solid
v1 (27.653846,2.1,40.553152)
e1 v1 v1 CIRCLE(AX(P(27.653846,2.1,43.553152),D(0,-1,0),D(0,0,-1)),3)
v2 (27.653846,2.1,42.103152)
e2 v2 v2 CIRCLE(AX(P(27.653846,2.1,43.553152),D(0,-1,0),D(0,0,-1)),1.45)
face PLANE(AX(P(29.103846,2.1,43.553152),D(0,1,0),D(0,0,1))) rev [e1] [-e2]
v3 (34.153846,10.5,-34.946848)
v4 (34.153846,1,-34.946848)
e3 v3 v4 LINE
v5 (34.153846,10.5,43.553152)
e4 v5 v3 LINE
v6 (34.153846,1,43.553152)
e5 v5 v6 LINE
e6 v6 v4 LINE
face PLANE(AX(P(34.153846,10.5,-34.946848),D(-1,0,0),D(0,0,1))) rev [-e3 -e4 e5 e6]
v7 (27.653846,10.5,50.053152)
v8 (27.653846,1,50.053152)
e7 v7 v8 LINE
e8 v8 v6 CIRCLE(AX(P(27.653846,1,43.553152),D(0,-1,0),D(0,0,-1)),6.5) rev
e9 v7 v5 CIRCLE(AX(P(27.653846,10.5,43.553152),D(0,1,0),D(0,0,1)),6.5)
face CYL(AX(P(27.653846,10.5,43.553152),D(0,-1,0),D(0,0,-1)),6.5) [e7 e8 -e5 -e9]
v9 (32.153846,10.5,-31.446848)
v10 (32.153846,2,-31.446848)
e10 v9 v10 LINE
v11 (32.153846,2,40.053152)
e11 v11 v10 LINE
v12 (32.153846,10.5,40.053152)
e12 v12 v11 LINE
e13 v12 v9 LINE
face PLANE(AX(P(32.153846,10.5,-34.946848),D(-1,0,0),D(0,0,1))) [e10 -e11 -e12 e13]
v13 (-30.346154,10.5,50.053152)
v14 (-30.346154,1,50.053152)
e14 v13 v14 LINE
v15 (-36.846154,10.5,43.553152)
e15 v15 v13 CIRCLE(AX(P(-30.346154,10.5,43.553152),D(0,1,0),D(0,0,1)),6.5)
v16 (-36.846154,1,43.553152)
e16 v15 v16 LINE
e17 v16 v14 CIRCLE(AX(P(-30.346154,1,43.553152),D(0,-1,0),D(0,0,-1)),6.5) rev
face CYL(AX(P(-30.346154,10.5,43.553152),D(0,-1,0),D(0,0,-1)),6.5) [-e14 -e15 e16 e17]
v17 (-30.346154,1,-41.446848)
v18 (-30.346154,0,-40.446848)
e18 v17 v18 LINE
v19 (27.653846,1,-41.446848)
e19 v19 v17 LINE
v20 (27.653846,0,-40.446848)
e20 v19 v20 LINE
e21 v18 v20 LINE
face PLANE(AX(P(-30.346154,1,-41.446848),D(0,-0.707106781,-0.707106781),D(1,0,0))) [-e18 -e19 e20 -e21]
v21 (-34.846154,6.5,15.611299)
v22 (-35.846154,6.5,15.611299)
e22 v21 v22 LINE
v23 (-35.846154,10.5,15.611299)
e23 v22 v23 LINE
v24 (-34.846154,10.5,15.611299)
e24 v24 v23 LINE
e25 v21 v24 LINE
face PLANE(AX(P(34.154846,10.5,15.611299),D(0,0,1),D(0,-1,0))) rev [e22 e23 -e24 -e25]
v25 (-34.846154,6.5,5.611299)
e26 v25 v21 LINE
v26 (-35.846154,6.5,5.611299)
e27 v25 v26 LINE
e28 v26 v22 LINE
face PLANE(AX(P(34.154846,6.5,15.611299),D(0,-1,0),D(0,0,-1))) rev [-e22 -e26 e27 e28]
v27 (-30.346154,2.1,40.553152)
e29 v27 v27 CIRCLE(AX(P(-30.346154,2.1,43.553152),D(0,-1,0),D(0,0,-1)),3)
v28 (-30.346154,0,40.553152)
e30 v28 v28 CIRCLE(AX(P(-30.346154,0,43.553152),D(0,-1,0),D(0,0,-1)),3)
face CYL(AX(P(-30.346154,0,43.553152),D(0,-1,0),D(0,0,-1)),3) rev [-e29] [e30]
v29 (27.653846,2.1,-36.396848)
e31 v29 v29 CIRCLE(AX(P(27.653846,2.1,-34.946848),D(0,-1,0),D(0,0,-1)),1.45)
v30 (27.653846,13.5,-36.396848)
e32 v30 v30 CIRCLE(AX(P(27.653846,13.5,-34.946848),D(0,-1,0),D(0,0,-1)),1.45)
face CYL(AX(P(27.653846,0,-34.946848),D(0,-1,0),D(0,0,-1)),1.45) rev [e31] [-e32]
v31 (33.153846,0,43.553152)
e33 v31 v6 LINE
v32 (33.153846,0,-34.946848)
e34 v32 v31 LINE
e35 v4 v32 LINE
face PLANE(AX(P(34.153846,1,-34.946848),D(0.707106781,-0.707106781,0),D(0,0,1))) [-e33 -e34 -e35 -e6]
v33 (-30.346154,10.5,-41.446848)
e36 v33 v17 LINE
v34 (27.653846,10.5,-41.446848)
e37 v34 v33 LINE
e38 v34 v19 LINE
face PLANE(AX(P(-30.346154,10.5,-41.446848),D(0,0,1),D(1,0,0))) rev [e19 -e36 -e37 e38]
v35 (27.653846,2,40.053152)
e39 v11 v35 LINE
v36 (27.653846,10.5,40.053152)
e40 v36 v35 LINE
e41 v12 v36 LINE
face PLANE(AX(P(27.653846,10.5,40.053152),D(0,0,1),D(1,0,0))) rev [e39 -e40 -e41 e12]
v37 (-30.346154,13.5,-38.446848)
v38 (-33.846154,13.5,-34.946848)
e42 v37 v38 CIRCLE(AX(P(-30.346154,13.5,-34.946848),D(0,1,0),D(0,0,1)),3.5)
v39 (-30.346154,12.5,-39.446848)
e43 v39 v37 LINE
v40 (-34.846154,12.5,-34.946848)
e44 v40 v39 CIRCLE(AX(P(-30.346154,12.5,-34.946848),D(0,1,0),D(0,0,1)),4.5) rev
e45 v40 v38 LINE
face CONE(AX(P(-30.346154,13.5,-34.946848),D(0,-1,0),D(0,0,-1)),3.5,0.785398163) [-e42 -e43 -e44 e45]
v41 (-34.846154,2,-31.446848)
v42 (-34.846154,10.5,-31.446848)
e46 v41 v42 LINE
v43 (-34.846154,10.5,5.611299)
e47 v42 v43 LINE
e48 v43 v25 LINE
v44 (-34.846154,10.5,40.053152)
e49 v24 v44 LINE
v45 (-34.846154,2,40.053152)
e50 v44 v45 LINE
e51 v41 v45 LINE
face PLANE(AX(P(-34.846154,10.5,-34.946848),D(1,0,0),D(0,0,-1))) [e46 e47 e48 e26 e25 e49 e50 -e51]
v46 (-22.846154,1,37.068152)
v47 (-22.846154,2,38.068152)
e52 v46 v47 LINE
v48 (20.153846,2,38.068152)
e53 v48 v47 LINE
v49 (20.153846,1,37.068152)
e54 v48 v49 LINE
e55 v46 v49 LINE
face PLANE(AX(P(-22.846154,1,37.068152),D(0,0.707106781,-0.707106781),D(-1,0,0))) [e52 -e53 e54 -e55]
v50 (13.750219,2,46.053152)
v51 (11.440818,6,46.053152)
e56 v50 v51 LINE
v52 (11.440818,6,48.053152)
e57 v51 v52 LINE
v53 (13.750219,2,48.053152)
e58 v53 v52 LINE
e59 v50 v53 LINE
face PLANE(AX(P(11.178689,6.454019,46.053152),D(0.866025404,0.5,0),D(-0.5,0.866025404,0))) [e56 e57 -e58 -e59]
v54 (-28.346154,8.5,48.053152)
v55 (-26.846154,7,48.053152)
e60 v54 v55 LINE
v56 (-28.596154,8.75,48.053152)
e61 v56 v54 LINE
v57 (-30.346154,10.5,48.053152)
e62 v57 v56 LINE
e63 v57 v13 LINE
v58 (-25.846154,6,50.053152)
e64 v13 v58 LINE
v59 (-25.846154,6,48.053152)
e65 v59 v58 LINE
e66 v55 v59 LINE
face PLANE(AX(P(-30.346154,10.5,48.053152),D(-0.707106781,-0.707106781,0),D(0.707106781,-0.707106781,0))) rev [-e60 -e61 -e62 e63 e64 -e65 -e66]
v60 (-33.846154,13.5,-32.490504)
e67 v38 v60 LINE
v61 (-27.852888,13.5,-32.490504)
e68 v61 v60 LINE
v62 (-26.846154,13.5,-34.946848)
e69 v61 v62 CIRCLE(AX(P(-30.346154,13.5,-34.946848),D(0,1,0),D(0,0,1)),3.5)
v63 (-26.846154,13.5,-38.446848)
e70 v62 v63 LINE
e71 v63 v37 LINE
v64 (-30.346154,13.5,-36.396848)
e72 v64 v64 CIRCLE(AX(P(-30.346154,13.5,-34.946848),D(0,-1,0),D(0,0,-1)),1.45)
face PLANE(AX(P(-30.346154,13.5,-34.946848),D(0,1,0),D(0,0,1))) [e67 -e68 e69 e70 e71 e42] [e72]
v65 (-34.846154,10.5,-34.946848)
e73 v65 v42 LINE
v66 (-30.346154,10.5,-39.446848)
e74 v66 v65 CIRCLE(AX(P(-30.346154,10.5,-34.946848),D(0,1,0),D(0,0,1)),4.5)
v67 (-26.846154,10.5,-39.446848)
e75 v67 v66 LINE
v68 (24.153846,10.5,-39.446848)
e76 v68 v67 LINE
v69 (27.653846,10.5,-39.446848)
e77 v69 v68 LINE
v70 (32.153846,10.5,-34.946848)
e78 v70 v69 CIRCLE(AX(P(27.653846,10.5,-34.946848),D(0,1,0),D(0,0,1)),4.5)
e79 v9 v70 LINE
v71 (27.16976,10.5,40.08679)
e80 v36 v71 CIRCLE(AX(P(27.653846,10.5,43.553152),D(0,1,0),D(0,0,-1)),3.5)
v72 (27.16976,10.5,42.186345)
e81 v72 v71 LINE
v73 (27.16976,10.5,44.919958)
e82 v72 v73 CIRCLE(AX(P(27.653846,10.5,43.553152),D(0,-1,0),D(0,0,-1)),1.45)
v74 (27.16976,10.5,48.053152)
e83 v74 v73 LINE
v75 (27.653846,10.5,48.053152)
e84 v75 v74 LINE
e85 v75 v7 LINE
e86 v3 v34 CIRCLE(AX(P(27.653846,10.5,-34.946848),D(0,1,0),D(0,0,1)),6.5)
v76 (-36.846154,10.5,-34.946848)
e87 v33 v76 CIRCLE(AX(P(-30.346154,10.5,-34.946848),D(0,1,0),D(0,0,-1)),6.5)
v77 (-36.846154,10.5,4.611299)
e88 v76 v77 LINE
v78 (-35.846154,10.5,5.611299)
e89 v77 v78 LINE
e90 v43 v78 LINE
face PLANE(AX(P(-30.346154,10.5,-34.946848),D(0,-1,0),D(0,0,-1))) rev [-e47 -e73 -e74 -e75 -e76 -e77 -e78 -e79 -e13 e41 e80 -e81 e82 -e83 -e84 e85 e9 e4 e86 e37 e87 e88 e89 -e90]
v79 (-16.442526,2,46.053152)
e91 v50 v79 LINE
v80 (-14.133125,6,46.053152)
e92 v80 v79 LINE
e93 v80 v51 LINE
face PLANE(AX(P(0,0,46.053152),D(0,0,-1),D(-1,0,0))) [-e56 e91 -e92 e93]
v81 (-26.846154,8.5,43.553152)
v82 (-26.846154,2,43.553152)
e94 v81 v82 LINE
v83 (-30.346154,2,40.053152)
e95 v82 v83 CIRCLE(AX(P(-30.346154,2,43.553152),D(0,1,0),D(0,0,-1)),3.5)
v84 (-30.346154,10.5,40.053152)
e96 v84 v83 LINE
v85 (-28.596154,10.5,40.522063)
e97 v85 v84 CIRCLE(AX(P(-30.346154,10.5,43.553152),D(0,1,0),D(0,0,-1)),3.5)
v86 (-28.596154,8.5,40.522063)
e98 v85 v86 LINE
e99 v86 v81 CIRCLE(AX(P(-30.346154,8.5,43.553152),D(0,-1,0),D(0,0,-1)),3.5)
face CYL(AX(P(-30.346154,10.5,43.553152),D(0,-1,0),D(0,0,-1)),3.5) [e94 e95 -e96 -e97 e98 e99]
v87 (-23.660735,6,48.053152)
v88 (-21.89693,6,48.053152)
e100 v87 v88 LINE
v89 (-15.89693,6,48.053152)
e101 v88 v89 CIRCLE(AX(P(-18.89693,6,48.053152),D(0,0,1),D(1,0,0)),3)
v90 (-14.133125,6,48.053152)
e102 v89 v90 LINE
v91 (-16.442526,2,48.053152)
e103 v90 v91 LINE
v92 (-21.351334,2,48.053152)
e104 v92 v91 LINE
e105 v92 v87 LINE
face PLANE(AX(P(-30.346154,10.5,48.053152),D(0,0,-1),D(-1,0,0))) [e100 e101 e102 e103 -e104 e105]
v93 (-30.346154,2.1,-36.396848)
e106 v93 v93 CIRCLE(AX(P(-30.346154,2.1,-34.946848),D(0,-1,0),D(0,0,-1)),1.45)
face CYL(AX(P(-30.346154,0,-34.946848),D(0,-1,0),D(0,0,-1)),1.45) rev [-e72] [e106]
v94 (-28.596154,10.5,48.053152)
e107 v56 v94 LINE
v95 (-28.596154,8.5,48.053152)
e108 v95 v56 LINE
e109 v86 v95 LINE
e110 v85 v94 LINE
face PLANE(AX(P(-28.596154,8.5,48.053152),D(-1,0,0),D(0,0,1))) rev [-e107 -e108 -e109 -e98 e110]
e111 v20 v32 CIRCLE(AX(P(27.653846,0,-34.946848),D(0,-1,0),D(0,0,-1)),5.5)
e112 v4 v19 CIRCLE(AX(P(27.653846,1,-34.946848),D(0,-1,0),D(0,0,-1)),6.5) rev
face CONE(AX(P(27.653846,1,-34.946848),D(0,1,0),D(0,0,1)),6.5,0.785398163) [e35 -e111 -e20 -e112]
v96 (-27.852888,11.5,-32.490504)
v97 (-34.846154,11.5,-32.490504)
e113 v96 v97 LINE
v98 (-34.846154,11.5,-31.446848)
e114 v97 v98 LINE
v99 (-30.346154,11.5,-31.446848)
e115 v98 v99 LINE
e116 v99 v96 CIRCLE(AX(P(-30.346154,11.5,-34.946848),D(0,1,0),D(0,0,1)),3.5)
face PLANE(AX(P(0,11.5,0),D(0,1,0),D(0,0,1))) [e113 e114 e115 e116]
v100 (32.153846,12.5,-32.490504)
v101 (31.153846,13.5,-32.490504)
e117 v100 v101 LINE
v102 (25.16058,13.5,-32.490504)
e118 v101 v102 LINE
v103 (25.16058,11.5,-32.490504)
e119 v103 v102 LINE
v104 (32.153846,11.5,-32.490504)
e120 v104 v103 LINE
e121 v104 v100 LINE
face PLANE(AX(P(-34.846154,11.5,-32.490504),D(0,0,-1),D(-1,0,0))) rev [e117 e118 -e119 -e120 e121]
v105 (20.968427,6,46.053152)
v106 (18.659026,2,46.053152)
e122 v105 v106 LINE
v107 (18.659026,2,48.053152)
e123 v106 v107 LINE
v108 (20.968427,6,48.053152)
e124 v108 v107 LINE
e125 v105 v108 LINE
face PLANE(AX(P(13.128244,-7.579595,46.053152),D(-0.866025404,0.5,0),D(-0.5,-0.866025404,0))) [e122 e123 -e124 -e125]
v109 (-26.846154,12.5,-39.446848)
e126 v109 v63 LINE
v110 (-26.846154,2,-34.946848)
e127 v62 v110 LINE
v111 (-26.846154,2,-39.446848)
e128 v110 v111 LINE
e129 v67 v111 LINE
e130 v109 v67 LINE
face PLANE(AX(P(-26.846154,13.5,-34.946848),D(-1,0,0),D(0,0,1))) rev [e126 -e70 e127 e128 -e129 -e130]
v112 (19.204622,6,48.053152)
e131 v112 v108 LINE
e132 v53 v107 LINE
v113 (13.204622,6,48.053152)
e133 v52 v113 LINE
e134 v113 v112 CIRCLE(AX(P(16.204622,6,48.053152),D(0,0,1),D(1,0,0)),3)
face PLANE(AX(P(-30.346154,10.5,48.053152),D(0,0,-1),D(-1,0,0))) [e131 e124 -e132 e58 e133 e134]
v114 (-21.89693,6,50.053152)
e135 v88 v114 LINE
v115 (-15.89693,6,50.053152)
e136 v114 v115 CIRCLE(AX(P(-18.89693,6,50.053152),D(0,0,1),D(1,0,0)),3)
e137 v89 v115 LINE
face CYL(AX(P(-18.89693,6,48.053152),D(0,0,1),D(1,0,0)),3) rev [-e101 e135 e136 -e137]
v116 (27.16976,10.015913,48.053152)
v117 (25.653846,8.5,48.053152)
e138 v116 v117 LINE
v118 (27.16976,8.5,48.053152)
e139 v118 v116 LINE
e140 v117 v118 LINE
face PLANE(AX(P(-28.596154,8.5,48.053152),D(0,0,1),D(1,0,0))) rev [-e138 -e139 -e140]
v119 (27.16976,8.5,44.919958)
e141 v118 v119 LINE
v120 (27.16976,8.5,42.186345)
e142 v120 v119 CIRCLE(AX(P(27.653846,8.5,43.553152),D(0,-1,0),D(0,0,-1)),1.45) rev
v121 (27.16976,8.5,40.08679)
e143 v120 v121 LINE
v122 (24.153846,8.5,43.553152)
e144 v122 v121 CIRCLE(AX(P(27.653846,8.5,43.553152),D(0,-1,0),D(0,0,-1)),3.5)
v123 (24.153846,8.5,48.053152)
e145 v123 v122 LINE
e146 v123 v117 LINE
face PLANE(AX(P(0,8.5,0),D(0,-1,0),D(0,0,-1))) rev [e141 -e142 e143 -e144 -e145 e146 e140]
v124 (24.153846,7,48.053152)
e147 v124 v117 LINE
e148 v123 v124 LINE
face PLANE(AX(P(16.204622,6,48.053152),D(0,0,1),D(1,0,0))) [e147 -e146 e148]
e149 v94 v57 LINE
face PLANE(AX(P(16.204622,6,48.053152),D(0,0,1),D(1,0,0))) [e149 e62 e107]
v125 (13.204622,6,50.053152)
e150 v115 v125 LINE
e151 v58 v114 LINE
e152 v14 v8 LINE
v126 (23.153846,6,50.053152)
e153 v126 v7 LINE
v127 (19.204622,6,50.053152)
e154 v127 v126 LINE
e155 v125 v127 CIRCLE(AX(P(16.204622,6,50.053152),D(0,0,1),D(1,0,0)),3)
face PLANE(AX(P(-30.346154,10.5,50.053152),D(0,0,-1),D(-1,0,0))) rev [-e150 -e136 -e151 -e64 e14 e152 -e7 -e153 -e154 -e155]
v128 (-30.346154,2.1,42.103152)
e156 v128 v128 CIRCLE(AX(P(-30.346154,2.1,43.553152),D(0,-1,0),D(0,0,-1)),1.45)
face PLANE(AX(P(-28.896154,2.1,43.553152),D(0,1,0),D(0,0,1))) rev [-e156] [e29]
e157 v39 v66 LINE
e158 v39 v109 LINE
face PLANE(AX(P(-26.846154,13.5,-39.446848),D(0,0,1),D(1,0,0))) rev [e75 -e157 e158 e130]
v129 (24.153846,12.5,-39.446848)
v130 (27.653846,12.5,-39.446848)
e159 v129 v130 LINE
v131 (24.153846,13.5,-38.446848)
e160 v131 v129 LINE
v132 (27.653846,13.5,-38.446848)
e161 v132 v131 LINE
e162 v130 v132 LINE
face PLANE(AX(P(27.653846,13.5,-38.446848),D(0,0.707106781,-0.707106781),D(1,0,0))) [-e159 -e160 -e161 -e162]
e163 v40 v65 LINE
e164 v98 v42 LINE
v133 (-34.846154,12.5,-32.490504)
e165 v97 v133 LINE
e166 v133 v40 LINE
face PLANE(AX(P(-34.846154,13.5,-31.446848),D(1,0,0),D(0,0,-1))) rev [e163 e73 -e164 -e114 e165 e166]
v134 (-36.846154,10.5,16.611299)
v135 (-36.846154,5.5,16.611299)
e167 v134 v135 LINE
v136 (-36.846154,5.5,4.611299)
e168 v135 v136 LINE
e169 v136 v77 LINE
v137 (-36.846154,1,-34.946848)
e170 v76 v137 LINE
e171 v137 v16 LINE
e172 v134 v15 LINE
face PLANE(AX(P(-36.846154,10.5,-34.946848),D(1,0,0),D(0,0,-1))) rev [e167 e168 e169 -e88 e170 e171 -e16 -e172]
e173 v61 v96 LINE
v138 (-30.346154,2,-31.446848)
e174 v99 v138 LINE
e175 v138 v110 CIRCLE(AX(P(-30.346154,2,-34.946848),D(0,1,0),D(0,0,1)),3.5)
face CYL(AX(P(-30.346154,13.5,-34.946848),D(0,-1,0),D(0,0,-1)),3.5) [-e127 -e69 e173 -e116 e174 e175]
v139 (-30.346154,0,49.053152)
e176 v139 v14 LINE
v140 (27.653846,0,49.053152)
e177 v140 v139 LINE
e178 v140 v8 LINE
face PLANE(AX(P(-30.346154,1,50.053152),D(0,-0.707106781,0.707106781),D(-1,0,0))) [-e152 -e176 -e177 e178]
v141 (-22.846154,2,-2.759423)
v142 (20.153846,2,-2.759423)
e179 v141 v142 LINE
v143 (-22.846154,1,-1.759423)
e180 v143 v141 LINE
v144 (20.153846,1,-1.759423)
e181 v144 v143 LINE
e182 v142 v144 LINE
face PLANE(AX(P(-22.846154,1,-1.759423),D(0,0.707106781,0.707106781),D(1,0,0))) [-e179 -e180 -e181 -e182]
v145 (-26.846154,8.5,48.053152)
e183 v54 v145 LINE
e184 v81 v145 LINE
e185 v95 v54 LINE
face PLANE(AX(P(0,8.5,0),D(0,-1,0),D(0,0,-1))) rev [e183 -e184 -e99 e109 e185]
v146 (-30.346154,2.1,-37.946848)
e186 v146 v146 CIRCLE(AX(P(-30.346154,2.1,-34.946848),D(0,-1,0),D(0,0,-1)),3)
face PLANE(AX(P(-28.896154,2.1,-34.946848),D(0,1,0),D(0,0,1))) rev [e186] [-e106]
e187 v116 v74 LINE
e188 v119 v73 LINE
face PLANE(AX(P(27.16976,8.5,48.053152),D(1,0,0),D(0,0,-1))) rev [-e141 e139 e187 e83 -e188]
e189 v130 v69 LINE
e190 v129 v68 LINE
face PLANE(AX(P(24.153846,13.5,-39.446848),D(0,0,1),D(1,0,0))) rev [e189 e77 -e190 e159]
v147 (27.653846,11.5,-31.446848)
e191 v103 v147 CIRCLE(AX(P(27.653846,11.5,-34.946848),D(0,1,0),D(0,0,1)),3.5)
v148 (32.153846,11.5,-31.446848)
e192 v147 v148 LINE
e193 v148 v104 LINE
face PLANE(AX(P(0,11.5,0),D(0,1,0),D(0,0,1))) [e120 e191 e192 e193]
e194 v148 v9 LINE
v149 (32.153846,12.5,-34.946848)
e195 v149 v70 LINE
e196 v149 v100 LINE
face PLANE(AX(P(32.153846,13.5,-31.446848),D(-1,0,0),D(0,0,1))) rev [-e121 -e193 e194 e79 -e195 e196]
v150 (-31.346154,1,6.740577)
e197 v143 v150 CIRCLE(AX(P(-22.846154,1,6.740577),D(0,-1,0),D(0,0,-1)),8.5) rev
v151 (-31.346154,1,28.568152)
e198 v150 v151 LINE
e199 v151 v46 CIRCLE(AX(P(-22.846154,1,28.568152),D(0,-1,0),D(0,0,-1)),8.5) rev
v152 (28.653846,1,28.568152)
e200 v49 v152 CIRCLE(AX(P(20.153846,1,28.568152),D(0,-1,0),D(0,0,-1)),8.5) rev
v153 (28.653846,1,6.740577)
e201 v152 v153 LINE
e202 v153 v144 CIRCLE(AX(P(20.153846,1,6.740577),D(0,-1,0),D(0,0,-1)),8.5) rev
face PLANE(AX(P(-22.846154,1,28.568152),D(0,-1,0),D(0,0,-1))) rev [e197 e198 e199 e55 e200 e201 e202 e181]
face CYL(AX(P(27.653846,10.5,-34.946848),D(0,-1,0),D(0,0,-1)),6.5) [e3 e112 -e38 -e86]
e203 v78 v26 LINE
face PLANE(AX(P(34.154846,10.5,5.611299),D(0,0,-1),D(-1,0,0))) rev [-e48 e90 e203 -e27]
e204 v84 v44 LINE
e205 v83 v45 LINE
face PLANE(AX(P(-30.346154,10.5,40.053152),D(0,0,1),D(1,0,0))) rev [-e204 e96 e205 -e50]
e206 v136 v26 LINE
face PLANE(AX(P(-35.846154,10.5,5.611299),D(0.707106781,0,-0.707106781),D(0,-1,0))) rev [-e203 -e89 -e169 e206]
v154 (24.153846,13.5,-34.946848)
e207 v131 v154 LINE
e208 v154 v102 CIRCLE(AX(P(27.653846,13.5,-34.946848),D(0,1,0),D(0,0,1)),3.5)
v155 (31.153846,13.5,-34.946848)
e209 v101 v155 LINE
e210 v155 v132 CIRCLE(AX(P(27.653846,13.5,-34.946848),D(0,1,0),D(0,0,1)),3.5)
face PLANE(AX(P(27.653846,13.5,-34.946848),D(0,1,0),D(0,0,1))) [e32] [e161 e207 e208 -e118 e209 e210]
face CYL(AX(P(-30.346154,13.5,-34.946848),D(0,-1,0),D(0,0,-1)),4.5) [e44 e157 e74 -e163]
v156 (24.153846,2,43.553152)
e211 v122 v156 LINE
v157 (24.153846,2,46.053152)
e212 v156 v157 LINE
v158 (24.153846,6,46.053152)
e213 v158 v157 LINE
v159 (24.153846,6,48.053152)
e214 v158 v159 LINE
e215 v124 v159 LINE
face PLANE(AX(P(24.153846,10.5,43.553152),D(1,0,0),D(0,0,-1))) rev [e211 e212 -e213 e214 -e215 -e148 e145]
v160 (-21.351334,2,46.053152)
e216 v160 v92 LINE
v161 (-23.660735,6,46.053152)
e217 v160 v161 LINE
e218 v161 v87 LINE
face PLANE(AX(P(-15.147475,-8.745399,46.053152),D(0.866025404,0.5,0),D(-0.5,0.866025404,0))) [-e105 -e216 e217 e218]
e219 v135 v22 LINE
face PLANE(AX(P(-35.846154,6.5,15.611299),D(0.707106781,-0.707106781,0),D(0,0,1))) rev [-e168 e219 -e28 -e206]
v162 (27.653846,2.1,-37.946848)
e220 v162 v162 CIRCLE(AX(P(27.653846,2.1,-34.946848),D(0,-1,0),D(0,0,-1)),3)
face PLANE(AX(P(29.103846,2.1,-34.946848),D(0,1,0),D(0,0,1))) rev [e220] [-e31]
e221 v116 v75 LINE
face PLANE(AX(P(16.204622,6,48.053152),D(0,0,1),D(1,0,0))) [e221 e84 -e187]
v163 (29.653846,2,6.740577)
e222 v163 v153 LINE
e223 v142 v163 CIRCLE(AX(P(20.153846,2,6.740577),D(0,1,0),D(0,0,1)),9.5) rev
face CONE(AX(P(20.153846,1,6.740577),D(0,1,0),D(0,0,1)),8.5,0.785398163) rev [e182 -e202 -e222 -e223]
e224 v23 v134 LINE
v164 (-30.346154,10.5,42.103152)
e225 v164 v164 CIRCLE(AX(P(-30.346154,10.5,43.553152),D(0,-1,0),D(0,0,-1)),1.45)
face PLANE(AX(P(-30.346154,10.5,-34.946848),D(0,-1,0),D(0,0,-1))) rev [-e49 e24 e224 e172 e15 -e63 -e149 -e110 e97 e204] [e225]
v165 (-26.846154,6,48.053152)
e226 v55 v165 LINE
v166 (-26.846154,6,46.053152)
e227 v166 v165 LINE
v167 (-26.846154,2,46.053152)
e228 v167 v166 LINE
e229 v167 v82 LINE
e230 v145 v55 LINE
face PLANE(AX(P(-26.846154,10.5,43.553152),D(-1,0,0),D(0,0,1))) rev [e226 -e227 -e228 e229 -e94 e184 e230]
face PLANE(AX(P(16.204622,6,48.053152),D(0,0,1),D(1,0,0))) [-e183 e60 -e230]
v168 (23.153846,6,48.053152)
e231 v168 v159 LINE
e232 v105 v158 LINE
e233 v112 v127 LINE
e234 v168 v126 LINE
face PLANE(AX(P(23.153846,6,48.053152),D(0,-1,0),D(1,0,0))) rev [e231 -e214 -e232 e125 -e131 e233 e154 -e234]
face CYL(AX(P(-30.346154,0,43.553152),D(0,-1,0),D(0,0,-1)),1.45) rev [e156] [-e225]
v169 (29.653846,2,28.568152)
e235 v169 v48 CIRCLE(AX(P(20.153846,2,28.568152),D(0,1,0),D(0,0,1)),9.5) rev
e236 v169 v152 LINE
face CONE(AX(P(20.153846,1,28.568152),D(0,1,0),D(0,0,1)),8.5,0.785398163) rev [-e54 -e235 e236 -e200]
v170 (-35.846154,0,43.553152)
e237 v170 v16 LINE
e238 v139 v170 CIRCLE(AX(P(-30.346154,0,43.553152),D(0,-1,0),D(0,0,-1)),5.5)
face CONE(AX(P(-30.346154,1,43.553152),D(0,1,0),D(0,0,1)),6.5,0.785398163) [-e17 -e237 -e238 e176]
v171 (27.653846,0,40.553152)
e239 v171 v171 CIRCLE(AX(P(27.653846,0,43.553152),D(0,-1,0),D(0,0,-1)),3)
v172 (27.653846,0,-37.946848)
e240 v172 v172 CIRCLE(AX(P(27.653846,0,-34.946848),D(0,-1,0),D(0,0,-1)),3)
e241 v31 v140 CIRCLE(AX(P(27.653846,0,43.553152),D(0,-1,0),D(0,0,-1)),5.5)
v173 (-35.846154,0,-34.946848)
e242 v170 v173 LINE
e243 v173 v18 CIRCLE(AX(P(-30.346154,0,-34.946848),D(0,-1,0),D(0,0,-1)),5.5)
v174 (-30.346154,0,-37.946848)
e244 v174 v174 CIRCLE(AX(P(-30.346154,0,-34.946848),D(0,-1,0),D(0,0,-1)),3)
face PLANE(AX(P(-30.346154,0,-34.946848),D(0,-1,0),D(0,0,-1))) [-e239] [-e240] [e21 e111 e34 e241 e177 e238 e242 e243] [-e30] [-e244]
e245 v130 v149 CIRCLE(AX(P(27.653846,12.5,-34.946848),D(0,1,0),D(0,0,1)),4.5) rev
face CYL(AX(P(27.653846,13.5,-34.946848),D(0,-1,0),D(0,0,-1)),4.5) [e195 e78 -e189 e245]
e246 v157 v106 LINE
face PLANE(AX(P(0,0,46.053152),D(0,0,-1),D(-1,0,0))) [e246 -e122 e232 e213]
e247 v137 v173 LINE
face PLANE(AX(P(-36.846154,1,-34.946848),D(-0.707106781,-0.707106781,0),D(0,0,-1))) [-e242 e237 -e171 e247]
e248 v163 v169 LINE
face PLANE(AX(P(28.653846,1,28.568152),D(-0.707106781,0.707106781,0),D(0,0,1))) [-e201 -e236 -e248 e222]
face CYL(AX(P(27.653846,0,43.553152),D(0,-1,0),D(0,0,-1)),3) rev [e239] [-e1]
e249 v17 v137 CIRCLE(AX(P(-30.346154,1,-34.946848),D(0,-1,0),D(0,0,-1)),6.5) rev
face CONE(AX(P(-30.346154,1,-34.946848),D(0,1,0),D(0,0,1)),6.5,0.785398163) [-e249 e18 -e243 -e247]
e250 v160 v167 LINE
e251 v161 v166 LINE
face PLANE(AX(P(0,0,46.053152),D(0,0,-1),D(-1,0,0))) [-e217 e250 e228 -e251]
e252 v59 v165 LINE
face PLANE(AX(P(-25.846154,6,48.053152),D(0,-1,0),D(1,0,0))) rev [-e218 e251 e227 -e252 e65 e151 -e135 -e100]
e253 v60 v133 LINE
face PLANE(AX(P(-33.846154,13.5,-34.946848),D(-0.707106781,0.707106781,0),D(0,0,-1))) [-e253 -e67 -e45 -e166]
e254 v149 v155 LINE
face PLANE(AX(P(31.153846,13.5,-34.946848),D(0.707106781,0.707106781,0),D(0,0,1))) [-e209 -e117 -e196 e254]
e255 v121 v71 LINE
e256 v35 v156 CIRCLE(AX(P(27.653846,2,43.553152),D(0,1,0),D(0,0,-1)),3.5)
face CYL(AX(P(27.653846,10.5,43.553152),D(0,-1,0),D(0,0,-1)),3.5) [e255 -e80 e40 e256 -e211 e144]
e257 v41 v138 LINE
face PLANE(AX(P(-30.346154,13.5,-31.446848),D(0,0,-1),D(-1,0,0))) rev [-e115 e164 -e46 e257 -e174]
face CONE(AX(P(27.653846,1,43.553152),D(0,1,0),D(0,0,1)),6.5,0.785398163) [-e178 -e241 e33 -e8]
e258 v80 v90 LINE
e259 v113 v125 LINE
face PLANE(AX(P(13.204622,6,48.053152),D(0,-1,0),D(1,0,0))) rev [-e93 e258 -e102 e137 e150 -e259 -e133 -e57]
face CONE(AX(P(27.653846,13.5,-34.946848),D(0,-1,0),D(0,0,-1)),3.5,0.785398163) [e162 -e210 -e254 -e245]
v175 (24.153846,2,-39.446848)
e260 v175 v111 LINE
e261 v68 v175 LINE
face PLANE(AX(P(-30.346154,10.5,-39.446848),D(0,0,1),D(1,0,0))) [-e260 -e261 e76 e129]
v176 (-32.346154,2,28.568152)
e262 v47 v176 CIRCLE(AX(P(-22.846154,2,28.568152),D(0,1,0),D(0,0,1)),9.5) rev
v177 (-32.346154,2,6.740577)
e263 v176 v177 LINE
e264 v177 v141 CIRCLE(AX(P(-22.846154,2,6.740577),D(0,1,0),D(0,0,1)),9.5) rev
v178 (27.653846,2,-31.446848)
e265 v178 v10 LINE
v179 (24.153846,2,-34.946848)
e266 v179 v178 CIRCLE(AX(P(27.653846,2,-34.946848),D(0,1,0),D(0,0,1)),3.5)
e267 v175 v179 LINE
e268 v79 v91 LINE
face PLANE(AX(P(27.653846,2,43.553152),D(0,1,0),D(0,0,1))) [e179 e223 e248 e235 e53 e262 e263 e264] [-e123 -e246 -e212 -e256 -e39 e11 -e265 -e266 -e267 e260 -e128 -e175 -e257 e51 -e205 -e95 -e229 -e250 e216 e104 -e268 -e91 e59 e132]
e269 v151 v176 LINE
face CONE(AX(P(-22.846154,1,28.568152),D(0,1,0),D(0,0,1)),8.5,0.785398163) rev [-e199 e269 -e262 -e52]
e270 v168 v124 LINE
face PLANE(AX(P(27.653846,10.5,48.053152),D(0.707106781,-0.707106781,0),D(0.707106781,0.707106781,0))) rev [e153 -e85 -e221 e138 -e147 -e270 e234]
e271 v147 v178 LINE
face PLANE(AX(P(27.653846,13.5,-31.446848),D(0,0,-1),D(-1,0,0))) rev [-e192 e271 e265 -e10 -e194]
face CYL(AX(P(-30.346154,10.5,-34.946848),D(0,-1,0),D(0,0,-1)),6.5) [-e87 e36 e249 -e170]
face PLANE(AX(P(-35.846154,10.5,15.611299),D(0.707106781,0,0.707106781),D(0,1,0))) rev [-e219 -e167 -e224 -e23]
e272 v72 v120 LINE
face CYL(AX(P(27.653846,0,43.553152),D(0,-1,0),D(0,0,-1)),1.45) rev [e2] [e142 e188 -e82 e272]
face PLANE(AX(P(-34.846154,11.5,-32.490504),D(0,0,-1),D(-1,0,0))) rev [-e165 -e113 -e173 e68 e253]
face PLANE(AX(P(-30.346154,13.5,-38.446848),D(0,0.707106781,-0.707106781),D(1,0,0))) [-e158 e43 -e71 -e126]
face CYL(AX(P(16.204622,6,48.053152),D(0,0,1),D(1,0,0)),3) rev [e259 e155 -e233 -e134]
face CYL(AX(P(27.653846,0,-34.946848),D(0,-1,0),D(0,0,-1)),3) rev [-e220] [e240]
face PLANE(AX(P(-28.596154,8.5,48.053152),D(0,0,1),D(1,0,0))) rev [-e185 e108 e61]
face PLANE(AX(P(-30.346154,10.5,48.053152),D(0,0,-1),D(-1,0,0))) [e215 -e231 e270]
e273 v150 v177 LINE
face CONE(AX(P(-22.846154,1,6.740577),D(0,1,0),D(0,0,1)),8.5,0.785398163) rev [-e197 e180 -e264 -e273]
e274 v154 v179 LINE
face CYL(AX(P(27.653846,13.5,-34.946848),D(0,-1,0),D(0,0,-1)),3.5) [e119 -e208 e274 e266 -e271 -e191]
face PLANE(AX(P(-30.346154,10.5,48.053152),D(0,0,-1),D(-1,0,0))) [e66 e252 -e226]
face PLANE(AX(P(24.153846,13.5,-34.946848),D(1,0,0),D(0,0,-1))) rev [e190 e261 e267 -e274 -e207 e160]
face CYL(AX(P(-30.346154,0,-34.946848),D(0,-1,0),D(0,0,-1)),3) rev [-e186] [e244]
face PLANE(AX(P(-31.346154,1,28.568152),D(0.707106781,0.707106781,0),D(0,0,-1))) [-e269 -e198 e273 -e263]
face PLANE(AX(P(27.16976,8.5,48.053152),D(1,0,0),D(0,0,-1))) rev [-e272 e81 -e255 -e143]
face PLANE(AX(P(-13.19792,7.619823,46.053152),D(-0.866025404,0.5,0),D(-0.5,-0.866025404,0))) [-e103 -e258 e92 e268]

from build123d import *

# Parameters (mm, degrees)
BOSS_EXTRUDE1_DEPTH                                = 10.5
BOSS_EXTRUDE2_DEPTH                                = 2
BOSS_EXTRUDE4_DEPTH                                = 11.5
BOSS_EXTRUDE6_DEPTH                                = 8.5
CUT_EXTRUDE1_DEPTH                                 = 2
CUT_EXTRUDE2_REACH                                 = 89.912
SKETCH9_W                                          = 10
SKETCH9_H                                          = 4
CHAMFER1_SIZE                                      = 1
CHAMFER2_SIZE                                      = 1
CBORE_FOR_M2_5_PAN_HEAD_MACHINE_SCREW1_D           = 2.9
CBORE_FOR_M2_5_PAN_HEAD_MACHINE_SCREW1_CBORE_D     = 6
CBORE_FOR_M2_5_PAN_HEAD_MACHINE_SCREW1_CBORE_DEPTH = 2.1
CBORE_FOR_M2_5_PAN_HEAD_MACHINE_SCREW2_D           = 2.9
CBORE_FOR_M2_5_PAN_HEAD_MACHINE_SCREW2_CBORE_D     = 6
CBORE_FOR_M2_5_PAN_HEAD_MACHINE_SCREW2_CBORE_DEPTH = 2.1
CBORE_FOR_M2_5_PAN_HEAD_MACHINE_SCREW3_D           = 2.9
CBORE_FOR_M2_5_PAN_HEAD_MACHINE_SCREW3_CBORE_D     = 6
CBORE_FOR_M2_5_PAN_HEAD_MACHINE_SCREW3_CBORE_DEPTH = 2.1
CBORE_FOR_M2_5_PAN_HEAD_MACHINE_SCREW4_D           = 2.9
CBORE_FOR_M2_5_PAN_HEAD_MACHINE_SCREW4_CBORE_D     = 6
CBORE_FOR_M2_5_PAN_HEAD_MACHINE_SCREW4_CBORE_DEPTH = 2.1
SKETCH18_W                                         = 55.765913406
SKETCH18_H                                         = 7.966361229
CUT_EXTRUDE3_DEPTH                                 = 2
BOSS_EXTRUDE7_DEPTH                                = 2
SKETCH21_W                                         = 67
SKETCH21_H                                         = 1.043656047
CUT_EXTRUDE4_DEPTH                                 = 2
CUT_EXTRUDE5_DEPTH                                 = 1
CHAMFER4_SIZE                                      = 1.5
CHAMFER5_SIZE                                      = 1
CHAMFER6_SIZE                                      = 1


with BuildPart() as part:
    # Sketch2 → Boss-Extrude1 (new body)
    with BuildSketch(Plane(origin=(0, 0, 0), x_dir=(1, 0, 0), z_dir=(0, 1, 0))):
        with BuildLine():
            Line((-30.346153846, 41.446848386), (27.653846154, 41.446848386))
            ThreePointArc((27.653846154, 41.446848386), (32.250040232, 39.543042463), (34.153846154, 34.946848386))
            Line((34.153846154, 34.946848386), (34.153846154, -43.553151614))
            ThreePointArc((34.153846154, -43.553151614), (32.250040232, -48.149345692), (27.653846154, -50.053151614))
            Line((27.653846154, -50.053151614), (-30.346153846, -50.053151614))
            ThreePointArc((-30.346153846, -50.053151614), (-34.942347924, -48.149345692), (-36.846153846, -43.553151614))
            Line((-36.846153846, -43.553151614), (-36.846153846, 34.946848386))
            ThreePointArc((-36.846153846, 34.946848386), (-34.942347924, 39.543042463), (-30.346153846, 41.446848386))
        make_face()
        with BuildLine():
            Line((-30.346153846, 39.446848386), (27.653846154, 39.446848386))
            ThreePointArc((27.653846154, 39.446848386), (30.835826669, 38.128828901), (32.153846154, 34.946848386))
            Line((32.153846154, 34.946848386), (32.153846154, -43.553151614))
            ThreePointArc((32.153846154, -43.553151614), (30.835826669, -46.73513213), (27.653846154, -48.053151614))
            Line((27.653846154, -48.053151614), (-30.346153846, -48.053151614))
            ThreePointArc((-30.346153846, -48.053151614), (-33.528134361, -46.73513213), (-34.846153846, -43.553151614))
            Line((-34.846153846, -43.553151614), (-34.846153846, 34.946848386))
            ThreePointArc((-34.846153846, 34.946848386), (-33.528134361, 38.128828901), (-30.346153846, 39.446848386))
        make_face(mode=Mode.SUBTRACT)
    extrude(amount=BOSS_EXTRUDE1_DEPTH)

    # Sketch3 → Boss-Extrude2 (add)
    with BuildSketch(Plane(origin=(0, 0, 0), x_dir=(1, 0, 0), z_dir=(0, 1, 0))):
        with BuildLine():
            Line((-30.346153846, -48.053151614), (27.653846154, -48.053151614))
            ThreePointArc((27.653846154, -48.053151614), (30.835826669, -46.73513213), (32.153846154, -43.553151614))
            Line((32.153846154, -43.553151614), (32.153846154, 34.946848386))
            ThreePointArc((32.153846154, 34.946848386), (30.835826669, 38.128828901), (27.653846154, 39.446848386))
            Line((27.653846154, 39.446848386), (-30.346153846, 39.446848386))
            ThreePointArc((-30.346153846, 39.446848386), (-33.528134361, 38.128828901), (-34.846153846, 34.946848386))
            Line((-34.846153846, 34.946848386), (-34.846153846, -43.553151614))
            ThreePointArc((-34.846153846, -43.553151614), (-33.528134361, -46.73513213), (-30.346153846, -48.053151614))
        make_face()
    extrude(amount=BOSS_EXTRUDE2_DEPTH)

    # Sketch6 → Boss-Extrude4 (add)
    with BuildSketch(Plane(origin=(0, 2, 0), x_dir=(1, 0, 0), z_dir=(0, 1, 0))):
        with BuildLine():
            Line((-26.846153846, 34.946848386), (-26.846153846, 39.446848386))
            Line((-26.846153846, 39.446848386), (-30.346153846, 39.446848386))
            ThreePointArc((-30.346153846, 39.446848386), (-33.528134361, 38.128828901), (-34.846153846, 34.946848386))
            Line((-34.846153846, 34.946848386), (-34.846153846, 31.446848386))
            Line((-34.846153846, 31.446848386), (-30.346153846, 31.446848386))
            ThreePointArc((-30.346153846, 31.446848386), (-27.871280112, 32.471974652), (-26.846153846, 34.946848386))
        make_face()
        with BuildLine():
            Line((24.153846154, 34.946848386), (24.153846154, 39.446848386))
            Line((24.153846154, 39.446848386), (27.653846154, 39.446848386))
            ThreePointArc((27.653846154, 39.446848386), (30.835826669, 38.128828901), (32.153846154, 34.946848386))
            Line((32.153846154, 34.946848386), (32.153846154, 31.446848386))
            Line((32.153846154, 31.446848386), (27.653846154, 31.446848386))
            ThreePointArc((27.653846154, 31.446848386), (25.17897242, 32.471974652), (24.153846154, 34.946848386))
        make_face()
    extrude(amount=BOSS_EXTRUDE4_DEPTH)

    # Sketch8 → Boss-Extrude6 (add)
    with BuildSketch(Plane(origin=(0, 2, 0), x_dir=(1, 0, 0), z_dir=(0, 1, 0))):
        with BuildLine():
            Line((32.153846154, -40.053151614), (32.153846154, -43.553151614))
            ThreePointArc((32.153846154, -43.553151614), (30.835826669, -46.73513213), (27.653846154, -48.053151614))
            Line((27.653846154, -48.053151614), (24.153846154, -48.053151614))
            Line((24.153846154, -48.053151614), (24.153846154, -43.553151614))
            ThreePointArc((24.153846154, -43.553151614), (25.17897242, -41.07827788), (27.653846154, -40.053151614))
            Line((27.653846154, -40.053151614), (32.153846154, -40.053151614))
        make_face()
        with BuildLine():
            Line((-34.846153846, -40.053151614), (-34.846153846, -43.553151614))
            ThreePointArc((-34.846153846, -43.553151614), (-33.528134361, -46.73513213), (-30.346153846, -48.053151614))
            Line((-30.346153846, -48.053151614), (-26.846153846, -48.053151614))
            Line((-26.846153846, -48.053151614), (-26.846153846, -43.553151614))
            ThreePointArc((-26.846153846, -43.553151614), (-27.871280112, -41.07827788), (-30.346153846, -40.053151614))
            Line((-30.346153846, -40.053151614), (-34.846153846, -40.053151614))
        make_face()
    extrude(amount=BOSS_EXTRUDE6_DEPTH)

    # Sketch7 → Cut-Extrude1 (cut)
    with BuildSketch(Plane.XY.offset(50.053151614)):
        with BuildLine():
            Line((27.653846154, 10.5), (-30.346153846, 10.5))
            Line((-30.346153846, 10.5), (-25.846153846, 6))
            Line((-25.846153846, 6), (-21.89693017, 6))
            ThreePointArc((-21.89693017, 6), (-18.89693017, 3), (-15.89693017, 6))
            Line((-15.89693017, 6), (13.204622477, 6))
            ThreePointArc((13.204622477, 6), (16.204622477, 3), (19.204622477, 6))
            Line((19.204622477, 6), (23.153846154, 6))
            Line((23.153846154, 6), (27.653846154, 10.5))
        make_face()
    extrude(amount=-CUT_EXTRUDE1_DEPTH, mode=Mode.SUBTRACT)

    # Sketch9 → Cut-Extrude2 (cut, up to next)
    with BuildSketch(Plane.ZY.offset(36.846153846), mode=Mode.PRIVATE) as cut_extrude2_sk1:
        with Locations((10.611298715, 8.5)):
            Rectangle(SKETCH9_W, SKETCH9_H)
    cut_extrude2_tool1 = extrude(cut_extrude2_sk1.sketch, amount=-CUT_EXTRUDE2_REACH, mode=Mode.PRIVATE) & part.part
    add(cut_extrude2_tool1.solids().sort_by_distance((-36.846154, 8.5, 10.611299))[0], mode=Mode.SUBTRACT)

    # Chamfer1
    chamfer1_edges = [part.edges().sort_by_distance(p)[0] for p in [
        (-36.846153846, 8.5, 5.611298715),
        (-36.846153846, 6.5, 10.611298715),
        (-36.846153846, 8.5, 15.611298715),
    ]]
    chamfer(chamfer1_edges, length=CHAMFER1_SIZE)

    # Chamfer2
    chamfer2_edges = [part.edges().sort_by_distance(p)[0] for p in [
        (-36.846153846, 0, 4.303151614),
        (-34.942347924, 0, -39.543042463),
        (-1.346153846, 0, -41.446848386),
        (32.250040232, 0, -39.543042463),
        (34.153846154, 0, 4.303151614),
        (32.250040232, 0, 48.149345692),
        (-1.346153846, 0, 50.053151614),
        (-34.942347924, 0, 48.149345692),
    ]]
    chamfer(chamfer2_edges, length=CHAMFER2_SIZE)

    # CBORE for M2.5 Pan Head Machine Screw1 (through all)
    with Locations(Plane(origin=(0, 0, 0), x_dir=(-1, 0, 0), z_dir=(0, -1, 0))):
        with Locations((-27.653846154, 34.946848386)):
            CounterBoreHole(CBORE_FOR_M2_5_PAN_HEAD_MACHINE_SCREW1_D / 2, CBORE_FOR_M2_5_PAN_HEAD_MACHINE_SCREW1_CBORE_D / 2, CBORE_FOR_M2_5_PAN_HEAD_MACHINE_SCREW1_CBORE_DEPTH)

    # CBORE for M2.5 Pan Head Machine Screw2 (through all)
    with Locations(Plane(origin=(0, 0, 0), x_dir=(-1, 0, 0), z_dir=(0, -1, 0))):
        with Locations((30.346153846, 34.946848386)):
            CounterBoreHole(CBORE_FOR_M2_5_PAN_HEAD_MACHINE_SCREW2_D / 2, CBORE_FOR_M2_5_PAN_HEAD_MACHINE_SCREW2_CBORE_D / 2, CBORE_FOR_M2_5_PAN_HEAD_MACHINE_SCREW2_CBORE_DEPTH)

    # CBORE for M2.5 Pan Head Machine Screw3 (through all)
    with Locations(Plane(origin=(0, 0, 0), x_dir=(-1, 0, 0), z_dir=(0, -1, 0))):
        with Locations((-27.653846154, -43.553151614)):
            CounterBoreHole(CBORE_FOR_M2_5_PAN_HEAD_MACHINE_SCREW3_D / 2, CBORE_FOR_M2_5_PAN_HEAD_MACHINE_SCREW3_CBORE_D / 2, CBORE_FOR_M2_5_PAN_HEAD_MACHINE_SCREW3_CBORE_DEPTH)

    # CBORE for M2.5 Pan Head Machine Screw4 (through all)
    with Locations(Plane(origin=(0, 0, 0), x_dir=(-1, 0, 0), z_dir=(0, -1, 0))):
        with Locations((30.346153846, -43.553151614)):
            CounterBoreHole(CBORE_FOR_M2_5_PAN_HEAD_MACHINE_SCREW4_D / 2, CBORE_FOR_M2_5_PAN_HEAD_MACHINE_SCREW4_CBORE_D / 2, CBORE_FOR_M2_5_PAN_HEAD_MACHINE_SCREW4_CBORE_DEPTH)

    # Sketch18 → Cut-Extrude3 (cut)
    with BuildSketch(Plane(origin=(0, 10.5, 0), x_dir=(1, 0, 0), z_dir=(0, 1, 0))):
        with Locations((-0.713197143, -44.069971)):
            Rectangle(SKETCH18_W, SKETCH18_H)
    extrude(amount=-CUT_EXTRUDE3_DEPTH, mode=Mode.SUBTRACT)

    # Sketch19 → Boss-Extrude7 (add)
    with BuildSketch(Plane(origin=(0, 0, 48.053151614), x_dir=(-1, 0, 0), z_dir=(0, 0, -1))):
        Polygon((-24.153846154, 2), (-18.659026224, 2), (-20.968427301, 6), (-21.953470486, 6), (-23.153846154, 6), (-24.153846154, 6), align=None)
        Polygon((-13.750218731, 2), (16.442526423, 2), (14.133125347, 6), (13.148082161, 6), (-10.455774469, 6), (-11.440817654, 6), align=None)
        Polygon((25.846153846, 6), (24.645778179, 6), (23.660734993, 6), (21.351333916, 2), (26.846153846, 2), (26.846153846, 6), align=None)
    extrude(amount=BOSS_EXTRUDE7_DEPTH)

    # Sketch21 → Cut-Extrude4 (cut)
    with BuildSketch(Plane(origin=(0, 13.5, 0), x_dir=(1, 0, 0), z_dir=(0, 1, 0))):
        with Locations((-1.346153846, 31.96867641)):
            Rectangle(SKETCH21_W, SKETCH21_H)
    extrude(amount=-CUT_EXTRUDE4_DEPTH, mode=Mode.SUBTRACT)

    # Sketch22 → Cut-Extrude5 (cut)
    with BuildSketch(Plane(origin=(0, 2, 0), x_dir=(1, 0, 0), z_dir=(0, 1, 0))):
        with BuildLine():
            Line((-22.846153846, 3.259423313), (20.153846154, 3.259423313))
            ThreePointArc((20.153846154, 3.259423313), (27.224913966, 0.330491125), (30.153846154, -6.740576687))
            Line((30.153846154, -6.740576687), (30.153846154, -28.568151594))
            ThreePointArc((30.153846154, -28.568151594), (27.224913966, -35.639219406), (20.153846154, -38.568151594))
            Line((20.153846154, -38.568151594), (-22.846153846, -38.568151594))
            ThreePointArc((-22.846153846, -38.568151594), (-29.917221658, -35.639219406), (-32.846153846, -28.568151594))
            Line((-32.846153846, -28.568151594), (-32.846153846, -6.740576687))
            ThreePointArc((-32.846153846, -6.740576687), (-29.917221658, 0.330491125), (-22.846153846, 3.259423313))
        make_face()
    extrude(amount=-CUT_EXTRUDE5_DEPTH, mode=Mode.SUBTRACT)

    # Chamfer4
    # the kernel refuses this chamfer: 1.5 mm, written as the material it adds along each edge
    with BuildSketch(Plane(origin=(20.153846154, 1, 38.568151594), x_dir=(0, 0.9996219169112968, 0.027495876610586775), z_dir=(-1, 0, 0))) as chamfer4_piece_1_section:
        Polygon((CHAMFER4_SIZE * 0.999621916911, CHAMFER4_SIZE * 0.0274958766106), (-CHAMFER4_SIZE * 0.0274958766106, CHAMFER4_SIZE * 0.999621916911), (0, 0), align=None)
    chamfer4_piece_1 = extrude(amount=43, mode=Mode.PRIVATE)
    chamfer4_piece_1 = split(chamfer4_piece_1, bisect_by=Plane(origin=(-1.346153846, 2, 38.022106092), z_dir=(0, -1, 0)), keep=Keep.TOP, mode=Mode.PRIVATE)
    add(chamfer4_piece_1)
    with BuildSketch(Plane(origin=(20.153846154, 1, 28.568151594), x_dir=(1, 0, 0), z_dir=(0, 0, -1))) as chamfer4_piece_2_section:
        Polygon((10, -CHAMFER4_SIZE), (10 - CHAMFER4_SIZE, 0), (10, 0), align=None)
    chamfer4_piece_2 = revolve(axis=Axis((20.153846154, 1, 28.568151594), (0, -1, 0)), revolution_arc=90, mode=Mode.PRIVATE)
    chamfer4_piece_2 = split(chamfer4_piece_2, bisect_by=Plane(origin=(26.515435334, 2, 34.929740774), z_dir=(0, -1, 0)), keep=Keep.TOP, mode=Mode.PRIVATE)
    add(chamfer4_piece_2)
    with BuildSketch(Plane(origin=(-22.846153846, 1, 28.568151594), x_dir=(0, 0, 1), z_dir=(1, 0, 0))) as chamfer4_piece_3_section:
        Polygon((10, -CHAMFER4_SIZE), (10 - CHAMFER4_SIZE, 0), (10, 0), align=None)
    chamfer4_piece_3 = revolve(axis=Axis((-22.846153846, 1, 28.568151594), (0, -1, 0)), revolution_arc=90, mode=Mode.PRIVATE)
    chamfer4_piece_3 = split(chamfer4_piece_3, bisect_by=Plane(origin=(-29.207743026, 2, 34.929740774), z_dir=(0, -1, 0)), keep=Keep.TOP, mode=Mode.PRIVATE)
    add(chamfer4_piece_3)
    with BuildSketch(Plane(origin=(30.153846154, 1, 6.740576687), x_dir=(0.027495876610586775, 0.9996219169112968, 0), z_dir=(0, 0, 1))) as chamfer4_piece_4_section:
        Polygon((CHAMFER4_SIZE * 0.999621916911, CHAMFER4_SIZE * 0.0274958766106), (-CHAMFER4_SIZE * 0.0274958766106, CHAMFER4_SIZE * 0.999621916911), (0, 0), align=None)
    chamfer4_piece_4 = extrude(amount=21.827574907, mode=Mode.PRIVATE)
    chamfer4_piece_4 = split(chamfer4_piece_4, bisect_by=Plane(origin=(29.607800651, 2, 17.654364141), z_dir=(0, -1, 0)), keep=Keep.TOP, mode=Mode.PRIVATE)
    add(chamfer4_piece_4)
    with BuildSketch(Plane(origin=(-32.846153846, 1, 28.568151594), x_dir=(-0.027495876610586775, 0.9996219169112968, 0), z_dir=(0, 0, -1))) as chamfer4_piece_5_section:
        Polygon((CHAMFER4_SIZE * 0.999621916911, CHAMFER4_SIZE * 0.0274958766106), (-CHAMFER4_SIZE * 0.0274958766106, CHAMFER4_SIZE * 0.999621916911), (0, 0), align=None)
    chamfer4_piece_5 = extrude(amount=21.827574907, mode=Mode.PRIVATE)
    chamfer4_piece_5 = split(chamfer4_piece_5, bisect_by=Plane(origin=(-32.300108344, 2, 17.654364141), z_dir=(0, -1, 0)), keep=Keep.TOP, mode=Mode.PRIVATE)
    add(chamfer4_piece_5)
    with BuildSketch(Plane(origin=(20.153846154, 1, 6.740576687), x_dir=(0, 0, -1), z_dir=(-1, 0, 0))) as chamfer4_piece_6_section:
        Polygon((10, -CHAMFER4_SIZE), (10 - CHAMFER4_SIZE, 0), (10, 0), align=None)
    chamfer4_piece_6 = revolve(axis=Axis((20.153846154, 1, 6.740576687), (0, -1, 0)), revolution_arc=90, mode=Mode.PRIVATE)
    chamfer4_piece_6 = split(chamfer4_piece_6, bisect_by=Plane(origin=(26.515435334, 2, 0.378987507), z_dir=(0, -1, 0)), keep=Keep.TOP, mode=Mode.PRIVATE)
    add(chamfer4_piece_6)
    with BuildSketch(Plane(origin=(-22.846153846, 1, 6.740576687), x_dir=(-1, 0, 0), z_dir=(0, 0, 1))) as chamfer4_piece_7_section:
        Polygon((10, -CHAMFER4_SIZE), (10 - CHAMFER4_SIZE, 0), (10, 0), align=None)
    chamfer4_piece_7 = revolve(axis=Axis((-22.846153846, 1, 6.740576687), (0, -1, 0)), revolution_arc=90, mode=Mode.PRIVATE)
    chamfer4_piece_7 = split(chamfer4_piece_7, bisect_by=Plane(origin=(-29.207743026, 2, 0.378987507), z_dir=(0, -1, 0)), keep=Keep.TOP, mode=Mode.PRIVATE)
    add(chamfer4_piece_7)
    with BuildSketch(Plane(origin=(-22.846153846, 1, -3.259423313), x_dir=(0, 0.9996219169112969, -0.02749587661058649), z_dir=(1, 0, 0))) as chamfer4_piece_8_section:
        Polygon((CHAMFER4_SIZE * 0.999621916911, CHAMFER4_SIZE * 0.0274958766106), (-CHAMFER4_SIZE * 0.0274958766106, CHAMFER4_SIZE * 0.999621916911), (0, 0), align=None)
    chamfer4_piece_8 = extrude(amount=43, mode=Mode.PRIVATE)
    chamfer4_piece_8 = split(chamfer4_piece_8, bisect_by=Plane(origin=(-1.346153846, 2, -2.713377811), z_dir=(0, -1, 0)), keep=Keep.TOP, mode=Mode.PRIVATE)
    add(chamfer4_piece_8)

    # Chamfer5
    chamfer5_edges = [part.edges().sort_by_distance(p)[0] for p in [
        (32.153846154, 13.5, -33.718676409),
        (30.835826669, 13.5, -38.128828901),
        (25.903846154, 13.5, -39.446848386),
    ]]
    chamfer(chamfer5_edges, length=CHAMFER5_SIZE)

    # Chamfer6
    chamfer6_edges = [part.edges().sort_by_distance(p)[0] for p in [
        (-28.596153846, 13.5, -39.446848386),
        (-33.528134361, 13.5, -38.128828901),
        (-34.846153846, 13.5, -33.718676409),
    ]]
    chamfer(chamfer6_edges, length=CHAMFER6_SIZE)


solid = part.part
